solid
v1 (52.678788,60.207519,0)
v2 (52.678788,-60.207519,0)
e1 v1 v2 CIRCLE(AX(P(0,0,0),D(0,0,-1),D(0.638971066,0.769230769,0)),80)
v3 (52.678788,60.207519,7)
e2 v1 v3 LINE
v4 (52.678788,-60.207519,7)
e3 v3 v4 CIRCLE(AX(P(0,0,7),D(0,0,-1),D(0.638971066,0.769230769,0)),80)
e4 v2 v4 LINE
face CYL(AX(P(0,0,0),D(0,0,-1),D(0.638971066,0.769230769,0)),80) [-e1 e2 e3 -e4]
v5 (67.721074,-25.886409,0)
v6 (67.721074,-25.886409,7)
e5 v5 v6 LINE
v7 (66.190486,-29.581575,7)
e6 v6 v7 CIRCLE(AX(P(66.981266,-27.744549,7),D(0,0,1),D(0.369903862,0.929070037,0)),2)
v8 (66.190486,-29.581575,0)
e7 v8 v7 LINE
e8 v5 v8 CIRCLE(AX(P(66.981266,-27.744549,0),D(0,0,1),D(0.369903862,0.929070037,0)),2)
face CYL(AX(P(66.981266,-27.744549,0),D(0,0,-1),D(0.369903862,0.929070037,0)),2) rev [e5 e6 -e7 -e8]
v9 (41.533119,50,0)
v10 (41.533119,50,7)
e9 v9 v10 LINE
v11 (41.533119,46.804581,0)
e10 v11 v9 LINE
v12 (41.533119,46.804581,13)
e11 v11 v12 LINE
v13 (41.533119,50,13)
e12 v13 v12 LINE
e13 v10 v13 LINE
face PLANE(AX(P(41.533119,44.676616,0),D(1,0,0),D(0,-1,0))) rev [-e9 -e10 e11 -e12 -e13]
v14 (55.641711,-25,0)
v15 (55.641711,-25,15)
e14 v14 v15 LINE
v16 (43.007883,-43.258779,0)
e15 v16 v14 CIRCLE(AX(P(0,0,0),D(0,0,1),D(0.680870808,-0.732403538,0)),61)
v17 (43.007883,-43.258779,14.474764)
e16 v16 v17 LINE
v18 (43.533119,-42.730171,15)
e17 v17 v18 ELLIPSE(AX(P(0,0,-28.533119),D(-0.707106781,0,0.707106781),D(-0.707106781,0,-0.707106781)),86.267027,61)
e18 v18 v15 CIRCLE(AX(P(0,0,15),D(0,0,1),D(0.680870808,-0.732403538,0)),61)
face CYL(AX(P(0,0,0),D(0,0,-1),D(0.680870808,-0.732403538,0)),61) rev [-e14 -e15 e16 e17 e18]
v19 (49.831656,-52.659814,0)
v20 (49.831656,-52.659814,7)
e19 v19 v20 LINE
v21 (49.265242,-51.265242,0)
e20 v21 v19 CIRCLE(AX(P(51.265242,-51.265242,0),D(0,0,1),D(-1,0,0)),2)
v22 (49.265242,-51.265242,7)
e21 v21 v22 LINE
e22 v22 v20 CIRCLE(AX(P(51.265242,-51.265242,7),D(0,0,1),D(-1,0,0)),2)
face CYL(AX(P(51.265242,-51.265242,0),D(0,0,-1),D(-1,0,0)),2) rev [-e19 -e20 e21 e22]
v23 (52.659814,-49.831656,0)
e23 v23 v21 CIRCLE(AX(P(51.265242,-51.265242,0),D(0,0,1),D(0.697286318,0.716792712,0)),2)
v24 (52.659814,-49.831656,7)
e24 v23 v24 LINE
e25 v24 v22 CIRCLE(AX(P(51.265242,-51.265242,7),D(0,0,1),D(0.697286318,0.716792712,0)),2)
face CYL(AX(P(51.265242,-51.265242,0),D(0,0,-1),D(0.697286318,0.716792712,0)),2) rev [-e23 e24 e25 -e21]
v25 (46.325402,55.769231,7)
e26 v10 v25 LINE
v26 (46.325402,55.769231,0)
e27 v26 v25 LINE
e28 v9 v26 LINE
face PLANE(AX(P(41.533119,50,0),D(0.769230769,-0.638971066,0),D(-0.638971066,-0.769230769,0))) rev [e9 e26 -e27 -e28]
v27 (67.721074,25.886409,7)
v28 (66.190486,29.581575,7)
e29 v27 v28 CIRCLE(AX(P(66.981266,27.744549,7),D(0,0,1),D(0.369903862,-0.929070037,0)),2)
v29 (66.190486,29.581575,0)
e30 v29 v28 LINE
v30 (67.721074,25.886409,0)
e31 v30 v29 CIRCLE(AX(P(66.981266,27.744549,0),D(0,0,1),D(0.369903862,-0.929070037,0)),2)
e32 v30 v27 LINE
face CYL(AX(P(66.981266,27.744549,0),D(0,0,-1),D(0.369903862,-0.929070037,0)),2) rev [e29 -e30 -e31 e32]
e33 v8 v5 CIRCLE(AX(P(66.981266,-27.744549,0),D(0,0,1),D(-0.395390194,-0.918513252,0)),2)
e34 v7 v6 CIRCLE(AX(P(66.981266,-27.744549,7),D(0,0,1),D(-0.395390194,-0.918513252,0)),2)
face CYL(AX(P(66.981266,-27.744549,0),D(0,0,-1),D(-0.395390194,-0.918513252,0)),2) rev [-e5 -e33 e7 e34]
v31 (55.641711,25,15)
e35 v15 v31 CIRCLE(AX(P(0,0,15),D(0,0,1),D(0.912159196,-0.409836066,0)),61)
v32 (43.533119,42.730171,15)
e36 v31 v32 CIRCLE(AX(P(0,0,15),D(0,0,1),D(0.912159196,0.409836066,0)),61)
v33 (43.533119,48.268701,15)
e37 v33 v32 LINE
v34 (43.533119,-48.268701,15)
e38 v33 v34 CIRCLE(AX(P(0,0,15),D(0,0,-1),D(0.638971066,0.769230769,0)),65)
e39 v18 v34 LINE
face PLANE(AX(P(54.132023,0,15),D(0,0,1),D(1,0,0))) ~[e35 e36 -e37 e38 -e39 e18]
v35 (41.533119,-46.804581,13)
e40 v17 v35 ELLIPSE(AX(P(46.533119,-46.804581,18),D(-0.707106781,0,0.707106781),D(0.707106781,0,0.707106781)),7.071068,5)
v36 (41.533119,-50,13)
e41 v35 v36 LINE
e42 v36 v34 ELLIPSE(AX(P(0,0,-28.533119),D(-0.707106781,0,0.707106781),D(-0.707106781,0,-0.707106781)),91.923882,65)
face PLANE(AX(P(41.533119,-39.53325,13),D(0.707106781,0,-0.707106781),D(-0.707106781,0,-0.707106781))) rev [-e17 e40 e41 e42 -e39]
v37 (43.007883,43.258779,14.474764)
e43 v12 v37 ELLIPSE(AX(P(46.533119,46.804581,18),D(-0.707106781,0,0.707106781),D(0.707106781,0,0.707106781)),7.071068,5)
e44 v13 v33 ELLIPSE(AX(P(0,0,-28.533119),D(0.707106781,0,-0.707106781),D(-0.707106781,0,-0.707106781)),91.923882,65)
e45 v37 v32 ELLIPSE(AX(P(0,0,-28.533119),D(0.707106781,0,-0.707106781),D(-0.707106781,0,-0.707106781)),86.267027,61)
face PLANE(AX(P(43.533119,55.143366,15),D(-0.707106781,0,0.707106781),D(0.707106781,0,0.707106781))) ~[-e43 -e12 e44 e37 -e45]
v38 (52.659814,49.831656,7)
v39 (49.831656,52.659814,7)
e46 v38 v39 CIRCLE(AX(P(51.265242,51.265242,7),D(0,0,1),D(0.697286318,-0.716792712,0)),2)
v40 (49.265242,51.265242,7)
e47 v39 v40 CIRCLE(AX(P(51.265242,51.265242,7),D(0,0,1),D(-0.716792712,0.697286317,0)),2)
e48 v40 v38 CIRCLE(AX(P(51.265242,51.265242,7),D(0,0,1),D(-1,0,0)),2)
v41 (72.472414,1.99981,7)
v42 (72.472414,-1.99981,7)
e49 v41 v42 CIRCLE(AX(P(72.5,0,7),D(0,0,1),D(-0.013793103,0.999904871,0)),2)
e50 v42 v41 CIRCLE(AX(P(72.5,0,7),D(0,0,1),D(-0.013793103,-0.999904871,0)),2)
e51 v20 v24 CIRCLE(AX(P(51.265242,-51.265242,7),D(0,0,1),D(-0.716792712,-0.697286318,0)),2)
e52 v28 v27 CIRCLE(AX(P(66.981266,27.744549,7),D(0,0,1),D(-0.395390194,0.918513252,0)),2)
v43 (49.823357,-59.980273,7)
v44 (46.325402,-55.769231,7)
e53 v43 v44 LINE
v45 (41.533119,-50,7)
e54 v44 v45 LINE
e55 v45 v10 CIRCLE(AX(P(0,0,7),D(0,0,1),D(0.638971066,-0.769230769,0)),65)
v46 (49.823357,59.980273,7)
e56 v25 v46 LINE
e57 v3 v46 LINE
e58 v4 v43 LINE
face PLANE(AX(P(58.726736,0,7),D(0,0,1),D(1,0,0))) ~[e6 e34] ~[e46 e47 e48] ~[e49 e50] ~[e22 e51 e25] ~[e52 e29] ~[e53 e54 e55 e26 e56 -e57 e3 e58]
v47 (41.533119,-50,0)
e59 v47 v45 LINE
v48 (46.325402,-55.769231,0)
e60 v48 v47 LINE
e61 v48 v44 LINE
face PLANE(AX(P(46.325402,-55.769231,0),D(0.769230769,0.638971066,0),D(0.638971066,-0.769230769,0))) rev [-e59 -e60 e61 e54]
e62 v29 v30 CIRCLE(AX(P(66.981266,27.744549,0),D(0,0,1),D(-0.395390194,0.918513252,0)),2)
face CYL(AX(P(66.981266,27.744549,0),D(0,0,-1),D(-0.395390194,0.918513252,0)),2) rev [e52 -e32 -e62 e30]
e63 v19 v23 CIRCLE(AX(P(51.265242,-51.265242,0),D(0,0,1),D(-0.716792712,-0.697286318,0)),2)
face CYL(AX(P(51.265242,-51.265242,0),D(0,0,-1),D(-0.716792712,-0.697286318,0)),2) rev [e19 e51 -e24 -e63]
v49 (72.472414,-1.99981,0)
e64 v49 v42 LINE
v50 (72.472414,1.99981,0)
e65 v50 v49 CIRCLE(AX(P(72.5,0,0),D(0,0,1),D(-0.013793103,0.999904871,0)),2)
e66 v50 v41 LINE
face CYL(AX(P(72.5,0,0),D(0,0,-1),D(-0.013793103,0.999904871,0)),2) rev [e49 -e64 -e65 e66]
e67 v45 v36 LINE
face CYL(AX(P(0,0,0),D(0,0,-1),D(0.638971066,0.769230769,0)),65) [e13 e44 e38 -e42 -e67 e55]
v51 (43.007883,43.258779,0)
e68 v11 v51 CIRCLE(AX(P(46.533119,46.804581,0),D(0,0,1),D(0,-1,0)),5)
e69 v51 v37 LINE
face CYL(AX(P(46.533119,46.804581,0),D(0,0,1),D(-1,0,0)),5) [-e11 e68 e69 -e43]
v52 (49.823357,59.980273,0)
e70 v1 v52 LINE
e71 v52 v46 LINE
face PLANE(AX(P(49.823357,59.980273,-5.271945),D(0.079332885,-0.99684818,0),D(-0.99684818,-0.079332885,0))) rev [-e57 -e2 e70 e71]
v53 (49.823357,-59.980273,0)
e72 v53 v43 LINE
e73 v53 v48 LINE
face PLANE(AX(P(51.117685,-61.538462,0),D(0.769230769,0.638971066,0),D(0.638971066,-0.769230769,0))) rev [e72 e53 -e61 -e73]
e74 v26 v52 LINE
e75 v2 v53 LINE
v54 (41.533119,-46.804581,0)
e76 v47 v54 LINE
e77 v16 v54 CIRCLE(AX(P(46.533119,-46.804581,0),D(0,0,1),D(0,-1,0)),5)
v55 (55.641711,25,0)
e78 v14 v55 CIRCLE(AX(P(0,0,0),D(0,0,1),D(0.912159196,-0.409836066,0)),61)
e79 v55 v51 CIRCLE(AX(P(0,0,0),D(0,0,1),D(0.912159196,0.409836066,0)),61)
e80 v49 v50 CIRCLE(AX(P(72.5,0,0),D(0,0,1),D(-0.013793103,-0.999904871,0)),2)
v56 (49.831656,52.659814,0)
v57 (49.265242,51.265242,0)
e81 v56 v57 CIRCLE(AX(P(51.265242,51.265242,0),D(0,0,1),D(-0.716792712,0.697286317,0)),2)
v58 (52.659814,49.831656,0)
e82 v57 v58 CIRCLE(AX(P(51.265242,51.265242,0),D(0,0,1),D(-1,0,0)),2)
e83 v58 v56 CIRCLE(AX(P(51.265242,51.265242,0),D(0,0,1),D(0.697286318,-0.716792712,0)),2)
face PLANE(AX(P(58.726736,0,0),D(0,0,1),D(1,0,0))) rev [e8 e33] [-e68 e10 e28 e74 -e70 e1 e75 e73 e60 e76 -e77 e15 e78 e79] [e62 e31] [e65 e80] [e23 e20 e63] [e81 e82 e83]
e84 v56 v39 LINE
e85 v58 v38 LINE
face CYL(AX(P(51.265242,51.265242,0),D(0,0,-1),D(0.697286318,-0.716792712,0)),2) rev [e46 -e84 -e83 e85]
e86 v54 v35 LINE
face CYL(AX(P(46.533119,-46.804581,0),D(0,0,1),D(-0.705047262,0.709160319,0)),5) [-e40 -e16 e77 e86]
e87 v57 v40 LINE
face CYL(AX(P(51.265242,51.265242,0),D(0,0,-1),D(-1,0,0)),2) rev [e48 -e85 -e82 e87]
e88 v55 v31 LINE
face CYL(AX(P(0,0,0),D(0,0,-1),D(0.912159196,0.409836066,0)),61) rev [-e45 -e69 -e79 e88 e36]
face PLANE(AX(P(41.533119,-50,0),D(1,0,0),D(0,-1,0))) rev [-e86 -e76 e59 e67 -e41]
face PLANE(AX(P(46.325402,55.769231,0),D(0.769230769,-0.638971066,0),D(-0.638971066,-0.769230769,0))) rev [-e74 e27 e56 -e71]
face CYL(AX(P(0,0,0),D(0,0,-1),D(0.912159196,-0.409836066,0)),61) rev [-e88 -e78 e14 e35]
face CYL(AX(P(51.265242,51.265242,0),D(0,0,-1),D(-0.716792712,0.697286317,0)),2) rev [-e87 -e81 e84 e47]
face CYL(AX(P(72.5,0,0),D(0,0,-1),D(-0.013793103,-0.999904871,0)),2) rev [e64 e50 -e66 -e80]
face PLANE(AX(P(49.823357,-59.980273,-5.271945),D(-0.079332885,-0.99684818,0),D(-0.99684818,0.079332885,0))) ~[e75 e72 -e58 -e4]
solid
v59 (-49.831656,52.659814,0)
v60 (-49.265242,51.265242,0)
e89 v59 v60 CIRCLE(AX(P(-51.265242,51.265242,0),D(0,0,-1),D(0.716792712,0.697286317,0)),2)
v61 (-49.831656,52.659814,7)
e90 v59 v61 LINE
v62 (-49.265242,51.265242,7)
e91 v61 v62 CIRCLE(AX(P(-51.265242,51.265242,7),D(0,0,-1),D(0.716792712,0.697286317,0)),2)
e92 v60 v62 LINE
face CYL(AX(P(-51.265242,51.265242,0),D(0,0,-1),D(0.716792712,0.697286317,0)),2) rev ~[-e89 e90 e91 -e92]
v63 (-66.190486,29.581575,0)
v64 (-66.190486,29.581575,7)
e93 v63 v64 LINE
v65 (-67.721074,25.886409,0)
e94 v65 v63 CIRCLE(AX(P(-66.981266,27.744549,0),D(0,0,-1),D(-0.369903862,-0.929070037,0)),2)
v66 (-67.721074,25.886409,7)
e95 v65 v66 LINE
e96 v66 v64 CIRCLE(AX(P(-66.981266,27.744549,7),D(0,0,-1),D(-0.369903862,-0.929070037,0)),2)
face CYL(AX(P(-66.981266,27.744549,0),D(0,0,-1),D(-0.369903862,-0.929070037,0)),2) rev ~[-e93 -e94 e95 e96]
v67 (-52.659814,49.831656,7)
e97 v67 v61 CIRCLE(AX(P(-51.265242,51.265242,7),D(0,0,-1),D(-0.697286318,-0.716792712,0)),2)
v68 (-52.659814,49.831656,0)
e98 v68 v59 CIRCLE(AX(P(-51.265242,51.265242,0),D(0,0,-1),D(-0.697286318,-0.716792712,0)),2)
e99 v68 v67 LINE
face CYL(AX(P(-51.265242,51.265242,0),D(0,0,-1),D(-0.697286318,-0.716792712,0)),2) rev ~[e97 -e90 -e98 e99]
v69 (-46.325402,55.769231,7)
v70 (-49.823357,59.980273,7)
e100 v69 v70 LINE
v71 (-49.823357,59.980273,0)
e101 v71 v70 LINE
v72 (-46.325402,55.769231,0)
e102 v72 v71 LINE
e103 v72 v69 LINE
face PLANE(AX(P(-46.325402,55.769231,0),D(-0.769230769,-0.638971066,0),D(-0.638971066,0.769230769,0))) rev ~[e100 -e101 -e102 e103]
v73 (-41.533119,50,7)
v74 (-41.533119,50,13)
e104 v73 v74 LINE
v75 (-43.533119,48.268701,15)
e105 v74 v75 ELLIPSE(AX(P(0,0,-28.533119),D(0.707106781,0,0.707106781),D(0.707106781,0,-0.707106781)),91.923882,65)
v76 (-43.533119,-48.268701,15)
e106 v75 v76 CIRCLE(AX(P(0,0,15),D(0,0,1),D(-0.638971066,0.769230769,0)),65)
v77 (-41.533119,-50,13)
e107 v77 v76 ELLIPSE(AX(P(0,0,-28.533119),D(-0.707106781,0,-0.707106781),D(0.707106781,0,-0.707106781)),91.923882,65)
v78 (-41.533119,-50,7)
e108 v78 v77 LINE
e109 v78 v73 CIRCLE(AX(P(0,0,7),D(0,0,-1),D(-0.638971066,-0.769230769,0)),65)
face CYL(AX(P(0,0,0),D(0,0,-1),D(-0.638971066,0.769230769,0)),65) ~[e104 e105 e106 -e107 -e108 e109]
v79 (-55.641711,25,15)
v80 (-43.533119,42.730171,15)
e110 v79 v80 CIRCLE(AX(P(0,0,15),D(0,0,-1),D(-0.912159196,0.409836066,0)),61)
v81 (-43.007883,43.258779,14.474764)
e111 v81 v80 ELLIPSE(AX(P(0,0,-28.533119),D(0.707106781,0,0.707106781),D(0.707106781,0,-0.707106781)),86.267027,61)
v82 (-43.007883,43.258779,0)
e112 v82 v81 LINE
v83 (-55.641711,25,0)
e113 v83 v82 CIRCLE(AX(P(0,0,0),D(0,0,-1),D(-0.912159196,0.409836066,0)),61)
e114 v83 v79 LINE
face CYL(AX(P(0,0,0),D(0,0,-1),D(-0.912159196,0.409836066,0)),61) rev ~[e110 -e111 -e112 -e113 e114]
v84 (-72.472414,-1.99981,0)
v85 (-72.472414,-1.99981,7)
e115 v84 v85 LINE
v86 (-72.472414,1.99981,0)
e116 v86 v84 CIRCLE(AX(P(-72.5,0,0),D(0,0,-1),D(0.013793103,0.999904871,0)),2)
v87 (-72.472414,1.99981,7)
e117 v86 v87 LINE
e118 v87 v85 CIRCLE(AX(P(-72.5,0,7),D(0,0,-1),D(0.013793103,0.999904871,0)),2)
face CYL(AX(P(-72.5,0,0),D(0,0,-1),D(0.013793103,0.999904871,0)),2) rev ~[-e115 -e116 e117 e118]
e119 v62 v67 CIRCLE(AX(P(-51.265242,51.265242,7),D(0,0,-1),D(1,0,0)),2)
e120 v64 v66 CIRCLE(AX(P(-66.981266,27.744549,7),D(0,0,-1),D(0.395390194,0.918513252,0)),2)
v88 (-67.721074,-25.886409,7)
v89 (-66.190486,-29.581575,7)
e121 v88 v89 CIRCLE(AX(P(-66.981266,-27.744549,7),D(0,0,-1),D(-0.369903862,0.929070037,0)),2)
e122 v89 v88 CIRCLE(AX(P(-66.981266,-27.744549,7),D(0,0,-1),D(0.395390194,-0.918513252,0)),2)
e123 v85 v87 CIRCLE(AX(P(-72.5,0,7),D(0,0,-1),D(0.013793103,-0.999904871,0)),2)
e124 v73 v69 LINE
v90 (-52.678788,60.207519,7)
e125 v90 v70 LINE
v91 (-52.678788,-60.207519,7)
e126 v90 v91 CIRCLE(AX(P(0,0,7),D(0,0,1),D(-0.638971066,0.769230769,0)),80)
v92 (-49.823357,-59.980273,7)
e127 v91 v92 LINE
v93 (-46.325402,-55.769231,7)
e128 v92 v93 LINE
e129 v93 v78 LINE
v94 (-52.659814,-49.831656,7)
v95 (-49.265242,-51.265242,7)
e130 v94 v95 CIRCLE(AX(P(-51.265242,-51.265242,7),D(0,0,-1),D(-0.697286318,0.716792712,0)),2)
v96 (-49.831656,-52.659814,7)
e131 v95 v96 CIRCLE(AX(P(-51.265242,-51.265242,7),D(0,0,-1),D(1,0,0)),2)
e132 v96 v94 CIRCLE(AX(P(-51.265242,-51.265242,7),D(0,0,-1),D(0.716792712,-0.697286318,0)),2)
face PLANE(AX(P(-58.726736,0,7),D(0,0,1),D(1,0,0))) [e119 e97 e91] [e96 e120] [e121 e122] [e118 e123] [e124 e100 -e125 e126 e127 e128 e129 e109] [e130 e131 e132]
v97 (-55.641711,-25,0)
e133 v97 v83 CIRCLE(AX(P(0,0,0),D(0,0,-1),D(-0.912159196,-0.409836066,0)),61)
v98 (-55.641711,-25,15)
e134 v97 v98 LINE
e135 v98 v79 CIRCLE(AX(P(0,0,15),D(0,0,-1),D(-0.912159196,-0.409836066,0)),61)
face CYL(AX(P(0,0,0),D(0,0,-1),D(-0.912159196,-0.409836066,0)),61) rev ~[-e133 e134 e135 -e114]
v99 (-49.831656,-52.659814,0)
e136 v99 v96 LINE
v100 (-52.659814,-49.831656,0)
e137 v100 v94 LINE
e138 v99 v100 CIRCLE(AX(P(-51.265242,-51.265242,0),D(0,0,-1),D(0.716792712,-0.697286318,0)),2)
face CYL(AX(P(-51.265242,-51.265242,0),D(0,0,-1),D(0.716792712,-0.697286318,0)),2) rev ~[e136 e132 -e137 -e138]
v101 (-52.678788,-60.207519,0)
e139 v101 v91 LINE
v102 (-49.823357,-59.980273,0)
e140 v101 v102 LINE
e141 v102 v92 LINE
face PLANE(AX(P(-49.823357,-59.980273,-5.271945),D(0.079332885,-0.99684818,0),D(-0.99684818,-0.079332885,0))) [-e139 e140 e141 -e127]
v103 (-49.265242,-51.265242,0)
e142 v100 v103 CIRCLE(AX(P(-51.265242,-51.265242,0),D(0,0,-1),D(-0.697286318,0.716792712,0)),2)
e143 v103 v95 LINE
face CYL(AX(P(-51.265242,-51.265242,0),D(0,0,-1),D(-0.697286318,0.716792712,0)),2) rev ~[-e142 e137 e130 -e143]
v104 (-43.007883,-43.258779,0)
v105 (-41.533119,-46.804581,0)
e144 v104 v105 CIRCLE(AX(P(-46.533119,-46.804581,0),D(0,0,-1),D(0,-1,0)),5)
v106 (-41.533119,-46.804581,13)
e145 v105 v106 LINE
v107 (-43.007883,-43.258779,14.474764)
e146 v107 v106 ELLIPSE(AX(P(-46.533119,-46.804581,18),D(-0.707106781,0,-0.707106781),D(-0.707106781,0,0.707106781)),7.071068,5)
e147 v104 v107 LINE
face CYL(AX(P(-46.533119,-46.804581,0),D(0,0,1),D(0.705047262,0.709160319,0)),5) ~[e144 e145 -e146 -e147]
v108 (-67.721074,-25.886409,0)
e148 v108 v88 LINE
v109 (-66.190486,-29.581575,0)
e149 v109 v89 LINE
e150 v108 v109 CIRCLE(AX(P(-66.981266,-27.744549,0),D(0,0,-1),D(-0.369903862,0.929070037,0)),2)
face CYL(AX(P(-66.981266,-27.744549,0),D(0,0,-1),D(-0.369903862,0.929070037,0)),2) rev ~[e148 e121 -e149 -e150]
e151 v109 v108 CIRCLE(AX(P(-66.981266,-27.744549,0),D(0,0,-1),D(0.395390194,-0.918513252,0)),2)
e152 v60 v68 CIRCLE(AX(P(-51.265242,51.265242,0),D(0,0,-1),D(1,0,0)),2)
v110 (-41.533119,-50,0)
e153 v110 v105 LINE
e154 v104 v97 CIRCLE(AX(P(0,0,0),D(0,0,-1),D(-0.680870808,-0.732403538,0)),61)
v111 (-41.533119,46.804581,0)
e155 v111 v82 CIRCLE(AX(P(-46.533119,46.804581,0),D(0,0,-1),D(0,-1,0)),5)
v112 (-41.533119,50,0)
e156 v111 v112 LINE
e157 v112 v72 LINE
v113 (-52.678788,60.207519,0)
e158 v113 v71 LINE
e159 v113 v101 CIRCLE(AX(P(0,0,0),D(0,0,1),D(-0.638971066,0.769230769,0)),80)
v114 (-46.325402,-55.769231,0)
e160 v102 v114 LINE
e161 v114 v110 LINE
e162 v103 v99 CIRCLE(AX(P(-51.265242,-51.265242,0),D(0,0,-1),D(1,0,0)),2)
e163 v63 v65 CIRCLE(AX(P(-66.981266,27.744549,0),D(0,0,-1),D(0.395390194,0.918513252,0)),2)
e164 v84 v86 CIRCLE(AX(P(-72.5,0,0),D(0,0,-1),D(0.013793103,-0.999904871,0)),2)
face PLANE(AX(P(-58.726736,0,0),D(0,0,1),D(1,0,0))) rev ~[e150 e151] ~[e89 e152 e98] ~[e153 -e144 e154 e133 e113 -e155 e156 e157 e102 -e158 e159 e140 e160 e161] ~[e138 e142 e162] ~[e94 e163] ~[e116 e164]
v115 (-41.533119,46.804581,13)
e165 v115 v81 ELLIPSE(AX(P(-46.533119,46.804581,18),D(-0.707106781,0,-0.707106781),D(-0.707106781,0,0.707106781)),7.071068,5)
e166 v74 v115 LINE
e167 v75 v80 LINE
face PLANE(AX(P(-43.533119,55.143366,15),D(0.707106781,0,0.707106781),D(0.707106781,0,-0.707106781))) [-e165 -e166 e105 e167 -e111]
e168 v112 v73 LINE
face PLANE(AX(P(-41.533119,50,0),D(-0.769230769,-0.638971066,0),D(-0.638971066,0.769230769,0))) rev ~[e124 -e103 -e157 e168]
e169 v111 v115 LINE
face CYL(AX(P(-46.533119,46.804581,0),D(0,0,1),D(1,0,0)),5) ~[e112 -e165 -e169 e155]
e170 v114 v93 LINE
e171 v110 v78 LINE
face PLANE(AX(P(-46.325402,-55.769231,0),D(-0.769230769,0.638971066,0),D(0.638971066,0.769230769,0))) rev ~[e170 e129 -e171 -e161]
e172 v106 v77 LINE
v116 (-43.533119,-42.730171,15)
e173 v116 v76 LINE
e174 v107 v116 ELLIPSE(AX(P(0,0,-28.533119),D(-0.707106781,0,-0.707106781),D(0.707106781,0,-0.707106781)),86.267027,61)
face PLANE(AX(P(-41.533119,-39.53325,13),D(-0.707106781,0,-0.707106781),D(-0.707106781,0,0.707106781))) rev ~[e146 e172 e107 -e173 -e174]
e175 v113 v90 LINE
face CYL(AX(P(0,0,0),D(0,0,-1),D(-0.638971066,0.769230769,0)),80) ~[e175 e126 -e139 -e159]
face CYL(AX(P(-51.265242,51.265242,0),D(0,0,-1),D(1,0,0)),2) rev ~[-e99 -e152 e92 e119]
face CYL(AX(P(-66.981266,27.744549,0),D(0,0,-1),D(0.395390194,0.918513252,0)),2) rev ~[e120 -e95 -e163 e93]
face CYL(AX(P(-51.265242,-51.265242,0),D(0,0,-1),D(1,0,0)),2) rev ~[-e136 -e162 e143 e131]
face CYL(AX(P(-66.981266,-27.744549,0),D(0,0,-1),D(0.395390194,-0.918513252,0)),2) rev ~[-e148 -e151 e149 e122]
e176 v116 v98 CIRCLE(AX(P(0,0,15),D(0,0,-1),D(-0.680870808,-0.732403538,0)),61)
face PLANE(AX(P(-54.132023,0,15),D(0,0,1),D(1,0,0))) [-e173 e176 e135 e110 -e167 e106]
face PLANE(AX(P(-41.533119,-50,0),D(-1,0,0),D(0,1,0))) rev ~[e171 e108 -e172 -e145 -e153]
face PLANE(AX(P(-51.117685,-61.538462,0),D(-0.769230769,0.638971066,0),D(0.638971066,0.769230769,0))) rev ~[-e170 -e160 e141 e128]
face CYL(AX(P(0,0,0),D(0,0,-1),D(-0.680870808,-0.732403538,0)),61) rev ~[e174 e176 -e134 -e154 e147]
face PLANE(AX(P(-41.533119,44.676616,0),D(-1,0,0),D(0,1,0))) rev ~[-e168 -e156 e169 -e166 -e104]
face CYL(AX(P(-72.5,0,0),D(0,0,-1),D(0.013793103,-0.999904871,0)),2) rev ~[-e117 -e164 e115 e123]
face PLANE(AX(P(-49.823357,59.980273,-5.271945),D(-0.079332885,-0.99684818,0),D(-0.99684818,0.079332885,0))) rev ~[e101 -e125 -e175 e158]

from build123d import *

# Parameters (mm, degrees)
F1_DEPTH    = 15
F2_DEPTH    = 7
F3_T1_DEPTH = 15.6101161445
F3_T3_DEPTH = 15.6101161445
F3_T5_DEPTH = 17.5438904605
F4_R        = 5


# Not quite as in the source:
# - a fillet or chamfer that OpenCascade refuses, or shapes differently, is made with other operations: its cross-section is extruded or revolved along the edge and cut away or added


with BuildPart() as f1:
    # F0 (on Top) → F1 (new body)
    with BuildSketch(Plane.XY):
        with BuildLine():
            ThreePointArc((-55.641710973, -25), (-61, 0), (-55.641710973, 25))
            ThreePointArc((-55.641710973, 25), (-49.5734728737, 35.5453342541), (-41.5331193146, 44.6766158074))
            Line((-41.5331193146, 44.6766158074), (-41.5331193146, 50))
            ThreePointArc((-41.5331193146, 50), (-65, 0), (-41.5331193146, -50))
            Line((-41.5331193146, -50), (-41.5331193146, -44.6766158074))
            ThreePointArc((-41.5331193146, -44.6766158074), (-49.5734728737, -35.5453342541), (-55.641710973, -25))
        make_face()
    extrude(amount=F1_DEPTH)

    # F0 (on Top) → F2 (join)
    with BuildSketch(Plane.XY):
        with BuildLine():
            ThreePointArc((-41.5331193146, -50), (-65, 0), (-41.5331193146, 50))
            Line((-41.5331193146, 50), (-46.3254023124, 55.7692307692))
            ThreePointArc((-46.3254023124, 55.7692307692), (-48.1036598795, 54.2428604168), (-49.8316562129, 52.6598142712))
            ThreePointArc((-49.8316562129, 52.6598142712), (-49.4122479979, 52.0178468293), (-49.265241636, 51.265241636))
            ThreePointArc((-49.265241636, 51.265241636), (-50.4871495047, 49.4228050333), (-52.6598142712, 49.8316562129))
            ThreePointArc((-52.6598142712, 49.8316562129), (-60.2815468919, 40.2788418939), (-66.1904857193, 29.581575351))
            ThreePointArc((-66.1904857193, 29.581575351), (-65.3107032116, 28.8441940675), (-64.9812661071, 27.7445488465))
            ThreePointArc((-64.9812661071, 27.7445488465), (-65.8586832477, 26.0893123909), (-67.721073831, 25.8864087733))
            ThreePointArc((-67.721073831, 25.8864087733), (-71.1069328292, 14.1440483462), (-72.4724137931, 1.9998097412))
            ThreePointArc((-72.4724137931, 1.9998097412), (-71.0760666424, 1.4044264997), (-70.5, 0))
            ThreePointArc((-70.5, 0), (-71.0760666424, -1.4044264997), (-72.4724137931, -1.9998097412))
            ThreePointArc((-72.4724137931, -1.9998097412), (-71.1069328292, -14.1440483462), (-67.721073831, -25.8864087733))
            ThreePointArc((-67.721073831, -25.8864087733), (-65.8586832477, -26.0893123909), (-64.9812661071, -27.7445488465))
            ThreePointArc((-64.9812661071, -27.7445488465), (-65.3107032116, -28.8441940675), (-66.1904857193, -29.581575351))
            ThreePointArc((-66.1904857193, -29.581575351), (-60.2815468919, -40.2788418939), (-52.6598142712, -49.8316562129))
            ThreePointArc((-52.6598142712, -49.8316562129), (-50.4871495047, -49.4228050333), (-49.265241636, -51.265241636))
            ThreePointArc((-49.265241636, -51.265241636), (-49.4122479979, -52.0178468293), (-49.8316562129, -52.6598142712))
            ThreePointArc((-49.8316562129, -52.6598142712), (-48.1036598795, -54.2428604168), (-46.3254023124, -55.7692307692))
            Line((-46.3254023124, -55.7692307692), (-41.5331193146, -50))
        make_face()
        with BuildLine():
            ThreePointArc((-49.8316562129, 52.6598142712), (-48.1036598795, 54.2428604168), (-46.3254023124, 55.7692307692))
            Line((-46.3254023124, 55.7692307692), (-51.1176853103, 61.5384615385))
            ThreePointArc((-51.1176853103, 61.5384615385), (-80, 0), (-51.1176853103, -61.5384615385))
            Line((-51.1176853103, -61.5384615385), (-46.3254023124, -55.7692307692))
            ThreePointArc((-46.3254023124, -55.7692307692), (-48.1036598795, -54.2428604168), (-49.8316562129, -52.6598142712))
            ThreePointArc((-49.8316562129, -52.6598142712), (-52.6794551984, -52.6794551984), (-52.6598142712, -49.8316562129))
            ThreePointArc((-52.6598142712, -49.8316562129), (-60.2815468919, -40.2788418939), (-66.1904857193, -29.581575351))
            ThreePointArc((-66.1904857193, -29.581575351), (-68.8290251721, -28.5099157112), (-67.721073831, -25.8864087733))
            ThreePointArc((-67.721073831, -25.8864087733), (-71.1069328292, -14.1440483462), (-72.4724137931, -1.9998097412))
            ThreePointArc((-72.4724137931, -1.9998097412), (-74.5, 0), (-72.4724137931, 1.9998097412))
            ThreePointArc((-72.4724137931, 1.9998097412), (-71.1069328292, 14.1440483462), (-67.721073831, 25.8864087733))
            ThreePointArc((-67.721073831, 25.8864087733), (-68.8290251721, 28.5099157112), (-66.1904857193, 29.581575351))
            ThreePointArc((-66.1904857193, 29.581575351), (-60.2815468919, 40.2788418939), (-52.6598142712, 49.8316562129))
            ThreePointArc((-52.6598142712, 49.8316562129), (-52.6794551984, 52.6794551984), (-49.8316562129, 52.6598142712))
        make_face()
    extrude(amount=F2_DEPTH)

    # F3: chamfer of 2 on 4 edges, made by hand

    # F3_s2 → F3_t1 (cut)
    with BuildSketch(Plane.XZ.offset(39.5332498314)):
        Polygon((-41.5331193146, 13), (-43.5331193146, 15), (-41.5331193146, 15), align=None)
    extrude(amount=F3_T1_DEPTH, mode=Mode.SUBTRACT)

    # F3_s4 → F3_t3 (cut)
    with BuildSketch(Plane.XZ.offset(-55.1433659759)):
        Polygon((-43.5331193146, 15), (-41.5331193146, 13), (-41.5331193146, 15), align=None)
    extrude(amount=F3_T3_DEPTH, mode=Mode.SUBTRACT)

    # F3_s6 → F3_t5 (cut)
    with BuildSketch(Plane.XY.offset(-5.2719452303)):
        with BuildLine():
            Line((-49.8233566102, 59.9802728911), (-52.6787878448, 60.2075187265))
            ThreePointArc((-52.6787878448, 60.2075187265), (-51.9240174848, 60.8596451538), (-51.1176853103, 61.5384615385))
            Line((-51.1176853103, 61.5384615385), (-49.8233566102, 59.9802728911))
        make_face()
        with BuildLine():
            Line((-49.8233566102, -59.9802728911), (-52.6787878448, -60.2075187265))
            ThreePointArc((-52.6787878448, -60.2075187265), (-51.9240174848, -60.8596451538), (-51.1176853103, -61.5384615385))
            Line((-51.1176853103, -61.5384615385), (-49.8233566102, -59.9802728911))
        make_face()
    extrude(amount=F3_T5_DEPTH, mode=Mode.SUBTRACT)

    # F4
    f4_edges = [f1.edges().sort_by_distance(p)[0] for p in [
        (-41.533119, 44.676616, 6.5),
        (-41.533119, -44.676616, 6.5),
    ]]
    fillet(f4_edges, radius=F4_R)


with BuildPart() as f5_1:
    # F5: instance of F1
    add(f1.part.mirror(Plane.YZ))


solid = Compound([f1.part, f5_1.part])
